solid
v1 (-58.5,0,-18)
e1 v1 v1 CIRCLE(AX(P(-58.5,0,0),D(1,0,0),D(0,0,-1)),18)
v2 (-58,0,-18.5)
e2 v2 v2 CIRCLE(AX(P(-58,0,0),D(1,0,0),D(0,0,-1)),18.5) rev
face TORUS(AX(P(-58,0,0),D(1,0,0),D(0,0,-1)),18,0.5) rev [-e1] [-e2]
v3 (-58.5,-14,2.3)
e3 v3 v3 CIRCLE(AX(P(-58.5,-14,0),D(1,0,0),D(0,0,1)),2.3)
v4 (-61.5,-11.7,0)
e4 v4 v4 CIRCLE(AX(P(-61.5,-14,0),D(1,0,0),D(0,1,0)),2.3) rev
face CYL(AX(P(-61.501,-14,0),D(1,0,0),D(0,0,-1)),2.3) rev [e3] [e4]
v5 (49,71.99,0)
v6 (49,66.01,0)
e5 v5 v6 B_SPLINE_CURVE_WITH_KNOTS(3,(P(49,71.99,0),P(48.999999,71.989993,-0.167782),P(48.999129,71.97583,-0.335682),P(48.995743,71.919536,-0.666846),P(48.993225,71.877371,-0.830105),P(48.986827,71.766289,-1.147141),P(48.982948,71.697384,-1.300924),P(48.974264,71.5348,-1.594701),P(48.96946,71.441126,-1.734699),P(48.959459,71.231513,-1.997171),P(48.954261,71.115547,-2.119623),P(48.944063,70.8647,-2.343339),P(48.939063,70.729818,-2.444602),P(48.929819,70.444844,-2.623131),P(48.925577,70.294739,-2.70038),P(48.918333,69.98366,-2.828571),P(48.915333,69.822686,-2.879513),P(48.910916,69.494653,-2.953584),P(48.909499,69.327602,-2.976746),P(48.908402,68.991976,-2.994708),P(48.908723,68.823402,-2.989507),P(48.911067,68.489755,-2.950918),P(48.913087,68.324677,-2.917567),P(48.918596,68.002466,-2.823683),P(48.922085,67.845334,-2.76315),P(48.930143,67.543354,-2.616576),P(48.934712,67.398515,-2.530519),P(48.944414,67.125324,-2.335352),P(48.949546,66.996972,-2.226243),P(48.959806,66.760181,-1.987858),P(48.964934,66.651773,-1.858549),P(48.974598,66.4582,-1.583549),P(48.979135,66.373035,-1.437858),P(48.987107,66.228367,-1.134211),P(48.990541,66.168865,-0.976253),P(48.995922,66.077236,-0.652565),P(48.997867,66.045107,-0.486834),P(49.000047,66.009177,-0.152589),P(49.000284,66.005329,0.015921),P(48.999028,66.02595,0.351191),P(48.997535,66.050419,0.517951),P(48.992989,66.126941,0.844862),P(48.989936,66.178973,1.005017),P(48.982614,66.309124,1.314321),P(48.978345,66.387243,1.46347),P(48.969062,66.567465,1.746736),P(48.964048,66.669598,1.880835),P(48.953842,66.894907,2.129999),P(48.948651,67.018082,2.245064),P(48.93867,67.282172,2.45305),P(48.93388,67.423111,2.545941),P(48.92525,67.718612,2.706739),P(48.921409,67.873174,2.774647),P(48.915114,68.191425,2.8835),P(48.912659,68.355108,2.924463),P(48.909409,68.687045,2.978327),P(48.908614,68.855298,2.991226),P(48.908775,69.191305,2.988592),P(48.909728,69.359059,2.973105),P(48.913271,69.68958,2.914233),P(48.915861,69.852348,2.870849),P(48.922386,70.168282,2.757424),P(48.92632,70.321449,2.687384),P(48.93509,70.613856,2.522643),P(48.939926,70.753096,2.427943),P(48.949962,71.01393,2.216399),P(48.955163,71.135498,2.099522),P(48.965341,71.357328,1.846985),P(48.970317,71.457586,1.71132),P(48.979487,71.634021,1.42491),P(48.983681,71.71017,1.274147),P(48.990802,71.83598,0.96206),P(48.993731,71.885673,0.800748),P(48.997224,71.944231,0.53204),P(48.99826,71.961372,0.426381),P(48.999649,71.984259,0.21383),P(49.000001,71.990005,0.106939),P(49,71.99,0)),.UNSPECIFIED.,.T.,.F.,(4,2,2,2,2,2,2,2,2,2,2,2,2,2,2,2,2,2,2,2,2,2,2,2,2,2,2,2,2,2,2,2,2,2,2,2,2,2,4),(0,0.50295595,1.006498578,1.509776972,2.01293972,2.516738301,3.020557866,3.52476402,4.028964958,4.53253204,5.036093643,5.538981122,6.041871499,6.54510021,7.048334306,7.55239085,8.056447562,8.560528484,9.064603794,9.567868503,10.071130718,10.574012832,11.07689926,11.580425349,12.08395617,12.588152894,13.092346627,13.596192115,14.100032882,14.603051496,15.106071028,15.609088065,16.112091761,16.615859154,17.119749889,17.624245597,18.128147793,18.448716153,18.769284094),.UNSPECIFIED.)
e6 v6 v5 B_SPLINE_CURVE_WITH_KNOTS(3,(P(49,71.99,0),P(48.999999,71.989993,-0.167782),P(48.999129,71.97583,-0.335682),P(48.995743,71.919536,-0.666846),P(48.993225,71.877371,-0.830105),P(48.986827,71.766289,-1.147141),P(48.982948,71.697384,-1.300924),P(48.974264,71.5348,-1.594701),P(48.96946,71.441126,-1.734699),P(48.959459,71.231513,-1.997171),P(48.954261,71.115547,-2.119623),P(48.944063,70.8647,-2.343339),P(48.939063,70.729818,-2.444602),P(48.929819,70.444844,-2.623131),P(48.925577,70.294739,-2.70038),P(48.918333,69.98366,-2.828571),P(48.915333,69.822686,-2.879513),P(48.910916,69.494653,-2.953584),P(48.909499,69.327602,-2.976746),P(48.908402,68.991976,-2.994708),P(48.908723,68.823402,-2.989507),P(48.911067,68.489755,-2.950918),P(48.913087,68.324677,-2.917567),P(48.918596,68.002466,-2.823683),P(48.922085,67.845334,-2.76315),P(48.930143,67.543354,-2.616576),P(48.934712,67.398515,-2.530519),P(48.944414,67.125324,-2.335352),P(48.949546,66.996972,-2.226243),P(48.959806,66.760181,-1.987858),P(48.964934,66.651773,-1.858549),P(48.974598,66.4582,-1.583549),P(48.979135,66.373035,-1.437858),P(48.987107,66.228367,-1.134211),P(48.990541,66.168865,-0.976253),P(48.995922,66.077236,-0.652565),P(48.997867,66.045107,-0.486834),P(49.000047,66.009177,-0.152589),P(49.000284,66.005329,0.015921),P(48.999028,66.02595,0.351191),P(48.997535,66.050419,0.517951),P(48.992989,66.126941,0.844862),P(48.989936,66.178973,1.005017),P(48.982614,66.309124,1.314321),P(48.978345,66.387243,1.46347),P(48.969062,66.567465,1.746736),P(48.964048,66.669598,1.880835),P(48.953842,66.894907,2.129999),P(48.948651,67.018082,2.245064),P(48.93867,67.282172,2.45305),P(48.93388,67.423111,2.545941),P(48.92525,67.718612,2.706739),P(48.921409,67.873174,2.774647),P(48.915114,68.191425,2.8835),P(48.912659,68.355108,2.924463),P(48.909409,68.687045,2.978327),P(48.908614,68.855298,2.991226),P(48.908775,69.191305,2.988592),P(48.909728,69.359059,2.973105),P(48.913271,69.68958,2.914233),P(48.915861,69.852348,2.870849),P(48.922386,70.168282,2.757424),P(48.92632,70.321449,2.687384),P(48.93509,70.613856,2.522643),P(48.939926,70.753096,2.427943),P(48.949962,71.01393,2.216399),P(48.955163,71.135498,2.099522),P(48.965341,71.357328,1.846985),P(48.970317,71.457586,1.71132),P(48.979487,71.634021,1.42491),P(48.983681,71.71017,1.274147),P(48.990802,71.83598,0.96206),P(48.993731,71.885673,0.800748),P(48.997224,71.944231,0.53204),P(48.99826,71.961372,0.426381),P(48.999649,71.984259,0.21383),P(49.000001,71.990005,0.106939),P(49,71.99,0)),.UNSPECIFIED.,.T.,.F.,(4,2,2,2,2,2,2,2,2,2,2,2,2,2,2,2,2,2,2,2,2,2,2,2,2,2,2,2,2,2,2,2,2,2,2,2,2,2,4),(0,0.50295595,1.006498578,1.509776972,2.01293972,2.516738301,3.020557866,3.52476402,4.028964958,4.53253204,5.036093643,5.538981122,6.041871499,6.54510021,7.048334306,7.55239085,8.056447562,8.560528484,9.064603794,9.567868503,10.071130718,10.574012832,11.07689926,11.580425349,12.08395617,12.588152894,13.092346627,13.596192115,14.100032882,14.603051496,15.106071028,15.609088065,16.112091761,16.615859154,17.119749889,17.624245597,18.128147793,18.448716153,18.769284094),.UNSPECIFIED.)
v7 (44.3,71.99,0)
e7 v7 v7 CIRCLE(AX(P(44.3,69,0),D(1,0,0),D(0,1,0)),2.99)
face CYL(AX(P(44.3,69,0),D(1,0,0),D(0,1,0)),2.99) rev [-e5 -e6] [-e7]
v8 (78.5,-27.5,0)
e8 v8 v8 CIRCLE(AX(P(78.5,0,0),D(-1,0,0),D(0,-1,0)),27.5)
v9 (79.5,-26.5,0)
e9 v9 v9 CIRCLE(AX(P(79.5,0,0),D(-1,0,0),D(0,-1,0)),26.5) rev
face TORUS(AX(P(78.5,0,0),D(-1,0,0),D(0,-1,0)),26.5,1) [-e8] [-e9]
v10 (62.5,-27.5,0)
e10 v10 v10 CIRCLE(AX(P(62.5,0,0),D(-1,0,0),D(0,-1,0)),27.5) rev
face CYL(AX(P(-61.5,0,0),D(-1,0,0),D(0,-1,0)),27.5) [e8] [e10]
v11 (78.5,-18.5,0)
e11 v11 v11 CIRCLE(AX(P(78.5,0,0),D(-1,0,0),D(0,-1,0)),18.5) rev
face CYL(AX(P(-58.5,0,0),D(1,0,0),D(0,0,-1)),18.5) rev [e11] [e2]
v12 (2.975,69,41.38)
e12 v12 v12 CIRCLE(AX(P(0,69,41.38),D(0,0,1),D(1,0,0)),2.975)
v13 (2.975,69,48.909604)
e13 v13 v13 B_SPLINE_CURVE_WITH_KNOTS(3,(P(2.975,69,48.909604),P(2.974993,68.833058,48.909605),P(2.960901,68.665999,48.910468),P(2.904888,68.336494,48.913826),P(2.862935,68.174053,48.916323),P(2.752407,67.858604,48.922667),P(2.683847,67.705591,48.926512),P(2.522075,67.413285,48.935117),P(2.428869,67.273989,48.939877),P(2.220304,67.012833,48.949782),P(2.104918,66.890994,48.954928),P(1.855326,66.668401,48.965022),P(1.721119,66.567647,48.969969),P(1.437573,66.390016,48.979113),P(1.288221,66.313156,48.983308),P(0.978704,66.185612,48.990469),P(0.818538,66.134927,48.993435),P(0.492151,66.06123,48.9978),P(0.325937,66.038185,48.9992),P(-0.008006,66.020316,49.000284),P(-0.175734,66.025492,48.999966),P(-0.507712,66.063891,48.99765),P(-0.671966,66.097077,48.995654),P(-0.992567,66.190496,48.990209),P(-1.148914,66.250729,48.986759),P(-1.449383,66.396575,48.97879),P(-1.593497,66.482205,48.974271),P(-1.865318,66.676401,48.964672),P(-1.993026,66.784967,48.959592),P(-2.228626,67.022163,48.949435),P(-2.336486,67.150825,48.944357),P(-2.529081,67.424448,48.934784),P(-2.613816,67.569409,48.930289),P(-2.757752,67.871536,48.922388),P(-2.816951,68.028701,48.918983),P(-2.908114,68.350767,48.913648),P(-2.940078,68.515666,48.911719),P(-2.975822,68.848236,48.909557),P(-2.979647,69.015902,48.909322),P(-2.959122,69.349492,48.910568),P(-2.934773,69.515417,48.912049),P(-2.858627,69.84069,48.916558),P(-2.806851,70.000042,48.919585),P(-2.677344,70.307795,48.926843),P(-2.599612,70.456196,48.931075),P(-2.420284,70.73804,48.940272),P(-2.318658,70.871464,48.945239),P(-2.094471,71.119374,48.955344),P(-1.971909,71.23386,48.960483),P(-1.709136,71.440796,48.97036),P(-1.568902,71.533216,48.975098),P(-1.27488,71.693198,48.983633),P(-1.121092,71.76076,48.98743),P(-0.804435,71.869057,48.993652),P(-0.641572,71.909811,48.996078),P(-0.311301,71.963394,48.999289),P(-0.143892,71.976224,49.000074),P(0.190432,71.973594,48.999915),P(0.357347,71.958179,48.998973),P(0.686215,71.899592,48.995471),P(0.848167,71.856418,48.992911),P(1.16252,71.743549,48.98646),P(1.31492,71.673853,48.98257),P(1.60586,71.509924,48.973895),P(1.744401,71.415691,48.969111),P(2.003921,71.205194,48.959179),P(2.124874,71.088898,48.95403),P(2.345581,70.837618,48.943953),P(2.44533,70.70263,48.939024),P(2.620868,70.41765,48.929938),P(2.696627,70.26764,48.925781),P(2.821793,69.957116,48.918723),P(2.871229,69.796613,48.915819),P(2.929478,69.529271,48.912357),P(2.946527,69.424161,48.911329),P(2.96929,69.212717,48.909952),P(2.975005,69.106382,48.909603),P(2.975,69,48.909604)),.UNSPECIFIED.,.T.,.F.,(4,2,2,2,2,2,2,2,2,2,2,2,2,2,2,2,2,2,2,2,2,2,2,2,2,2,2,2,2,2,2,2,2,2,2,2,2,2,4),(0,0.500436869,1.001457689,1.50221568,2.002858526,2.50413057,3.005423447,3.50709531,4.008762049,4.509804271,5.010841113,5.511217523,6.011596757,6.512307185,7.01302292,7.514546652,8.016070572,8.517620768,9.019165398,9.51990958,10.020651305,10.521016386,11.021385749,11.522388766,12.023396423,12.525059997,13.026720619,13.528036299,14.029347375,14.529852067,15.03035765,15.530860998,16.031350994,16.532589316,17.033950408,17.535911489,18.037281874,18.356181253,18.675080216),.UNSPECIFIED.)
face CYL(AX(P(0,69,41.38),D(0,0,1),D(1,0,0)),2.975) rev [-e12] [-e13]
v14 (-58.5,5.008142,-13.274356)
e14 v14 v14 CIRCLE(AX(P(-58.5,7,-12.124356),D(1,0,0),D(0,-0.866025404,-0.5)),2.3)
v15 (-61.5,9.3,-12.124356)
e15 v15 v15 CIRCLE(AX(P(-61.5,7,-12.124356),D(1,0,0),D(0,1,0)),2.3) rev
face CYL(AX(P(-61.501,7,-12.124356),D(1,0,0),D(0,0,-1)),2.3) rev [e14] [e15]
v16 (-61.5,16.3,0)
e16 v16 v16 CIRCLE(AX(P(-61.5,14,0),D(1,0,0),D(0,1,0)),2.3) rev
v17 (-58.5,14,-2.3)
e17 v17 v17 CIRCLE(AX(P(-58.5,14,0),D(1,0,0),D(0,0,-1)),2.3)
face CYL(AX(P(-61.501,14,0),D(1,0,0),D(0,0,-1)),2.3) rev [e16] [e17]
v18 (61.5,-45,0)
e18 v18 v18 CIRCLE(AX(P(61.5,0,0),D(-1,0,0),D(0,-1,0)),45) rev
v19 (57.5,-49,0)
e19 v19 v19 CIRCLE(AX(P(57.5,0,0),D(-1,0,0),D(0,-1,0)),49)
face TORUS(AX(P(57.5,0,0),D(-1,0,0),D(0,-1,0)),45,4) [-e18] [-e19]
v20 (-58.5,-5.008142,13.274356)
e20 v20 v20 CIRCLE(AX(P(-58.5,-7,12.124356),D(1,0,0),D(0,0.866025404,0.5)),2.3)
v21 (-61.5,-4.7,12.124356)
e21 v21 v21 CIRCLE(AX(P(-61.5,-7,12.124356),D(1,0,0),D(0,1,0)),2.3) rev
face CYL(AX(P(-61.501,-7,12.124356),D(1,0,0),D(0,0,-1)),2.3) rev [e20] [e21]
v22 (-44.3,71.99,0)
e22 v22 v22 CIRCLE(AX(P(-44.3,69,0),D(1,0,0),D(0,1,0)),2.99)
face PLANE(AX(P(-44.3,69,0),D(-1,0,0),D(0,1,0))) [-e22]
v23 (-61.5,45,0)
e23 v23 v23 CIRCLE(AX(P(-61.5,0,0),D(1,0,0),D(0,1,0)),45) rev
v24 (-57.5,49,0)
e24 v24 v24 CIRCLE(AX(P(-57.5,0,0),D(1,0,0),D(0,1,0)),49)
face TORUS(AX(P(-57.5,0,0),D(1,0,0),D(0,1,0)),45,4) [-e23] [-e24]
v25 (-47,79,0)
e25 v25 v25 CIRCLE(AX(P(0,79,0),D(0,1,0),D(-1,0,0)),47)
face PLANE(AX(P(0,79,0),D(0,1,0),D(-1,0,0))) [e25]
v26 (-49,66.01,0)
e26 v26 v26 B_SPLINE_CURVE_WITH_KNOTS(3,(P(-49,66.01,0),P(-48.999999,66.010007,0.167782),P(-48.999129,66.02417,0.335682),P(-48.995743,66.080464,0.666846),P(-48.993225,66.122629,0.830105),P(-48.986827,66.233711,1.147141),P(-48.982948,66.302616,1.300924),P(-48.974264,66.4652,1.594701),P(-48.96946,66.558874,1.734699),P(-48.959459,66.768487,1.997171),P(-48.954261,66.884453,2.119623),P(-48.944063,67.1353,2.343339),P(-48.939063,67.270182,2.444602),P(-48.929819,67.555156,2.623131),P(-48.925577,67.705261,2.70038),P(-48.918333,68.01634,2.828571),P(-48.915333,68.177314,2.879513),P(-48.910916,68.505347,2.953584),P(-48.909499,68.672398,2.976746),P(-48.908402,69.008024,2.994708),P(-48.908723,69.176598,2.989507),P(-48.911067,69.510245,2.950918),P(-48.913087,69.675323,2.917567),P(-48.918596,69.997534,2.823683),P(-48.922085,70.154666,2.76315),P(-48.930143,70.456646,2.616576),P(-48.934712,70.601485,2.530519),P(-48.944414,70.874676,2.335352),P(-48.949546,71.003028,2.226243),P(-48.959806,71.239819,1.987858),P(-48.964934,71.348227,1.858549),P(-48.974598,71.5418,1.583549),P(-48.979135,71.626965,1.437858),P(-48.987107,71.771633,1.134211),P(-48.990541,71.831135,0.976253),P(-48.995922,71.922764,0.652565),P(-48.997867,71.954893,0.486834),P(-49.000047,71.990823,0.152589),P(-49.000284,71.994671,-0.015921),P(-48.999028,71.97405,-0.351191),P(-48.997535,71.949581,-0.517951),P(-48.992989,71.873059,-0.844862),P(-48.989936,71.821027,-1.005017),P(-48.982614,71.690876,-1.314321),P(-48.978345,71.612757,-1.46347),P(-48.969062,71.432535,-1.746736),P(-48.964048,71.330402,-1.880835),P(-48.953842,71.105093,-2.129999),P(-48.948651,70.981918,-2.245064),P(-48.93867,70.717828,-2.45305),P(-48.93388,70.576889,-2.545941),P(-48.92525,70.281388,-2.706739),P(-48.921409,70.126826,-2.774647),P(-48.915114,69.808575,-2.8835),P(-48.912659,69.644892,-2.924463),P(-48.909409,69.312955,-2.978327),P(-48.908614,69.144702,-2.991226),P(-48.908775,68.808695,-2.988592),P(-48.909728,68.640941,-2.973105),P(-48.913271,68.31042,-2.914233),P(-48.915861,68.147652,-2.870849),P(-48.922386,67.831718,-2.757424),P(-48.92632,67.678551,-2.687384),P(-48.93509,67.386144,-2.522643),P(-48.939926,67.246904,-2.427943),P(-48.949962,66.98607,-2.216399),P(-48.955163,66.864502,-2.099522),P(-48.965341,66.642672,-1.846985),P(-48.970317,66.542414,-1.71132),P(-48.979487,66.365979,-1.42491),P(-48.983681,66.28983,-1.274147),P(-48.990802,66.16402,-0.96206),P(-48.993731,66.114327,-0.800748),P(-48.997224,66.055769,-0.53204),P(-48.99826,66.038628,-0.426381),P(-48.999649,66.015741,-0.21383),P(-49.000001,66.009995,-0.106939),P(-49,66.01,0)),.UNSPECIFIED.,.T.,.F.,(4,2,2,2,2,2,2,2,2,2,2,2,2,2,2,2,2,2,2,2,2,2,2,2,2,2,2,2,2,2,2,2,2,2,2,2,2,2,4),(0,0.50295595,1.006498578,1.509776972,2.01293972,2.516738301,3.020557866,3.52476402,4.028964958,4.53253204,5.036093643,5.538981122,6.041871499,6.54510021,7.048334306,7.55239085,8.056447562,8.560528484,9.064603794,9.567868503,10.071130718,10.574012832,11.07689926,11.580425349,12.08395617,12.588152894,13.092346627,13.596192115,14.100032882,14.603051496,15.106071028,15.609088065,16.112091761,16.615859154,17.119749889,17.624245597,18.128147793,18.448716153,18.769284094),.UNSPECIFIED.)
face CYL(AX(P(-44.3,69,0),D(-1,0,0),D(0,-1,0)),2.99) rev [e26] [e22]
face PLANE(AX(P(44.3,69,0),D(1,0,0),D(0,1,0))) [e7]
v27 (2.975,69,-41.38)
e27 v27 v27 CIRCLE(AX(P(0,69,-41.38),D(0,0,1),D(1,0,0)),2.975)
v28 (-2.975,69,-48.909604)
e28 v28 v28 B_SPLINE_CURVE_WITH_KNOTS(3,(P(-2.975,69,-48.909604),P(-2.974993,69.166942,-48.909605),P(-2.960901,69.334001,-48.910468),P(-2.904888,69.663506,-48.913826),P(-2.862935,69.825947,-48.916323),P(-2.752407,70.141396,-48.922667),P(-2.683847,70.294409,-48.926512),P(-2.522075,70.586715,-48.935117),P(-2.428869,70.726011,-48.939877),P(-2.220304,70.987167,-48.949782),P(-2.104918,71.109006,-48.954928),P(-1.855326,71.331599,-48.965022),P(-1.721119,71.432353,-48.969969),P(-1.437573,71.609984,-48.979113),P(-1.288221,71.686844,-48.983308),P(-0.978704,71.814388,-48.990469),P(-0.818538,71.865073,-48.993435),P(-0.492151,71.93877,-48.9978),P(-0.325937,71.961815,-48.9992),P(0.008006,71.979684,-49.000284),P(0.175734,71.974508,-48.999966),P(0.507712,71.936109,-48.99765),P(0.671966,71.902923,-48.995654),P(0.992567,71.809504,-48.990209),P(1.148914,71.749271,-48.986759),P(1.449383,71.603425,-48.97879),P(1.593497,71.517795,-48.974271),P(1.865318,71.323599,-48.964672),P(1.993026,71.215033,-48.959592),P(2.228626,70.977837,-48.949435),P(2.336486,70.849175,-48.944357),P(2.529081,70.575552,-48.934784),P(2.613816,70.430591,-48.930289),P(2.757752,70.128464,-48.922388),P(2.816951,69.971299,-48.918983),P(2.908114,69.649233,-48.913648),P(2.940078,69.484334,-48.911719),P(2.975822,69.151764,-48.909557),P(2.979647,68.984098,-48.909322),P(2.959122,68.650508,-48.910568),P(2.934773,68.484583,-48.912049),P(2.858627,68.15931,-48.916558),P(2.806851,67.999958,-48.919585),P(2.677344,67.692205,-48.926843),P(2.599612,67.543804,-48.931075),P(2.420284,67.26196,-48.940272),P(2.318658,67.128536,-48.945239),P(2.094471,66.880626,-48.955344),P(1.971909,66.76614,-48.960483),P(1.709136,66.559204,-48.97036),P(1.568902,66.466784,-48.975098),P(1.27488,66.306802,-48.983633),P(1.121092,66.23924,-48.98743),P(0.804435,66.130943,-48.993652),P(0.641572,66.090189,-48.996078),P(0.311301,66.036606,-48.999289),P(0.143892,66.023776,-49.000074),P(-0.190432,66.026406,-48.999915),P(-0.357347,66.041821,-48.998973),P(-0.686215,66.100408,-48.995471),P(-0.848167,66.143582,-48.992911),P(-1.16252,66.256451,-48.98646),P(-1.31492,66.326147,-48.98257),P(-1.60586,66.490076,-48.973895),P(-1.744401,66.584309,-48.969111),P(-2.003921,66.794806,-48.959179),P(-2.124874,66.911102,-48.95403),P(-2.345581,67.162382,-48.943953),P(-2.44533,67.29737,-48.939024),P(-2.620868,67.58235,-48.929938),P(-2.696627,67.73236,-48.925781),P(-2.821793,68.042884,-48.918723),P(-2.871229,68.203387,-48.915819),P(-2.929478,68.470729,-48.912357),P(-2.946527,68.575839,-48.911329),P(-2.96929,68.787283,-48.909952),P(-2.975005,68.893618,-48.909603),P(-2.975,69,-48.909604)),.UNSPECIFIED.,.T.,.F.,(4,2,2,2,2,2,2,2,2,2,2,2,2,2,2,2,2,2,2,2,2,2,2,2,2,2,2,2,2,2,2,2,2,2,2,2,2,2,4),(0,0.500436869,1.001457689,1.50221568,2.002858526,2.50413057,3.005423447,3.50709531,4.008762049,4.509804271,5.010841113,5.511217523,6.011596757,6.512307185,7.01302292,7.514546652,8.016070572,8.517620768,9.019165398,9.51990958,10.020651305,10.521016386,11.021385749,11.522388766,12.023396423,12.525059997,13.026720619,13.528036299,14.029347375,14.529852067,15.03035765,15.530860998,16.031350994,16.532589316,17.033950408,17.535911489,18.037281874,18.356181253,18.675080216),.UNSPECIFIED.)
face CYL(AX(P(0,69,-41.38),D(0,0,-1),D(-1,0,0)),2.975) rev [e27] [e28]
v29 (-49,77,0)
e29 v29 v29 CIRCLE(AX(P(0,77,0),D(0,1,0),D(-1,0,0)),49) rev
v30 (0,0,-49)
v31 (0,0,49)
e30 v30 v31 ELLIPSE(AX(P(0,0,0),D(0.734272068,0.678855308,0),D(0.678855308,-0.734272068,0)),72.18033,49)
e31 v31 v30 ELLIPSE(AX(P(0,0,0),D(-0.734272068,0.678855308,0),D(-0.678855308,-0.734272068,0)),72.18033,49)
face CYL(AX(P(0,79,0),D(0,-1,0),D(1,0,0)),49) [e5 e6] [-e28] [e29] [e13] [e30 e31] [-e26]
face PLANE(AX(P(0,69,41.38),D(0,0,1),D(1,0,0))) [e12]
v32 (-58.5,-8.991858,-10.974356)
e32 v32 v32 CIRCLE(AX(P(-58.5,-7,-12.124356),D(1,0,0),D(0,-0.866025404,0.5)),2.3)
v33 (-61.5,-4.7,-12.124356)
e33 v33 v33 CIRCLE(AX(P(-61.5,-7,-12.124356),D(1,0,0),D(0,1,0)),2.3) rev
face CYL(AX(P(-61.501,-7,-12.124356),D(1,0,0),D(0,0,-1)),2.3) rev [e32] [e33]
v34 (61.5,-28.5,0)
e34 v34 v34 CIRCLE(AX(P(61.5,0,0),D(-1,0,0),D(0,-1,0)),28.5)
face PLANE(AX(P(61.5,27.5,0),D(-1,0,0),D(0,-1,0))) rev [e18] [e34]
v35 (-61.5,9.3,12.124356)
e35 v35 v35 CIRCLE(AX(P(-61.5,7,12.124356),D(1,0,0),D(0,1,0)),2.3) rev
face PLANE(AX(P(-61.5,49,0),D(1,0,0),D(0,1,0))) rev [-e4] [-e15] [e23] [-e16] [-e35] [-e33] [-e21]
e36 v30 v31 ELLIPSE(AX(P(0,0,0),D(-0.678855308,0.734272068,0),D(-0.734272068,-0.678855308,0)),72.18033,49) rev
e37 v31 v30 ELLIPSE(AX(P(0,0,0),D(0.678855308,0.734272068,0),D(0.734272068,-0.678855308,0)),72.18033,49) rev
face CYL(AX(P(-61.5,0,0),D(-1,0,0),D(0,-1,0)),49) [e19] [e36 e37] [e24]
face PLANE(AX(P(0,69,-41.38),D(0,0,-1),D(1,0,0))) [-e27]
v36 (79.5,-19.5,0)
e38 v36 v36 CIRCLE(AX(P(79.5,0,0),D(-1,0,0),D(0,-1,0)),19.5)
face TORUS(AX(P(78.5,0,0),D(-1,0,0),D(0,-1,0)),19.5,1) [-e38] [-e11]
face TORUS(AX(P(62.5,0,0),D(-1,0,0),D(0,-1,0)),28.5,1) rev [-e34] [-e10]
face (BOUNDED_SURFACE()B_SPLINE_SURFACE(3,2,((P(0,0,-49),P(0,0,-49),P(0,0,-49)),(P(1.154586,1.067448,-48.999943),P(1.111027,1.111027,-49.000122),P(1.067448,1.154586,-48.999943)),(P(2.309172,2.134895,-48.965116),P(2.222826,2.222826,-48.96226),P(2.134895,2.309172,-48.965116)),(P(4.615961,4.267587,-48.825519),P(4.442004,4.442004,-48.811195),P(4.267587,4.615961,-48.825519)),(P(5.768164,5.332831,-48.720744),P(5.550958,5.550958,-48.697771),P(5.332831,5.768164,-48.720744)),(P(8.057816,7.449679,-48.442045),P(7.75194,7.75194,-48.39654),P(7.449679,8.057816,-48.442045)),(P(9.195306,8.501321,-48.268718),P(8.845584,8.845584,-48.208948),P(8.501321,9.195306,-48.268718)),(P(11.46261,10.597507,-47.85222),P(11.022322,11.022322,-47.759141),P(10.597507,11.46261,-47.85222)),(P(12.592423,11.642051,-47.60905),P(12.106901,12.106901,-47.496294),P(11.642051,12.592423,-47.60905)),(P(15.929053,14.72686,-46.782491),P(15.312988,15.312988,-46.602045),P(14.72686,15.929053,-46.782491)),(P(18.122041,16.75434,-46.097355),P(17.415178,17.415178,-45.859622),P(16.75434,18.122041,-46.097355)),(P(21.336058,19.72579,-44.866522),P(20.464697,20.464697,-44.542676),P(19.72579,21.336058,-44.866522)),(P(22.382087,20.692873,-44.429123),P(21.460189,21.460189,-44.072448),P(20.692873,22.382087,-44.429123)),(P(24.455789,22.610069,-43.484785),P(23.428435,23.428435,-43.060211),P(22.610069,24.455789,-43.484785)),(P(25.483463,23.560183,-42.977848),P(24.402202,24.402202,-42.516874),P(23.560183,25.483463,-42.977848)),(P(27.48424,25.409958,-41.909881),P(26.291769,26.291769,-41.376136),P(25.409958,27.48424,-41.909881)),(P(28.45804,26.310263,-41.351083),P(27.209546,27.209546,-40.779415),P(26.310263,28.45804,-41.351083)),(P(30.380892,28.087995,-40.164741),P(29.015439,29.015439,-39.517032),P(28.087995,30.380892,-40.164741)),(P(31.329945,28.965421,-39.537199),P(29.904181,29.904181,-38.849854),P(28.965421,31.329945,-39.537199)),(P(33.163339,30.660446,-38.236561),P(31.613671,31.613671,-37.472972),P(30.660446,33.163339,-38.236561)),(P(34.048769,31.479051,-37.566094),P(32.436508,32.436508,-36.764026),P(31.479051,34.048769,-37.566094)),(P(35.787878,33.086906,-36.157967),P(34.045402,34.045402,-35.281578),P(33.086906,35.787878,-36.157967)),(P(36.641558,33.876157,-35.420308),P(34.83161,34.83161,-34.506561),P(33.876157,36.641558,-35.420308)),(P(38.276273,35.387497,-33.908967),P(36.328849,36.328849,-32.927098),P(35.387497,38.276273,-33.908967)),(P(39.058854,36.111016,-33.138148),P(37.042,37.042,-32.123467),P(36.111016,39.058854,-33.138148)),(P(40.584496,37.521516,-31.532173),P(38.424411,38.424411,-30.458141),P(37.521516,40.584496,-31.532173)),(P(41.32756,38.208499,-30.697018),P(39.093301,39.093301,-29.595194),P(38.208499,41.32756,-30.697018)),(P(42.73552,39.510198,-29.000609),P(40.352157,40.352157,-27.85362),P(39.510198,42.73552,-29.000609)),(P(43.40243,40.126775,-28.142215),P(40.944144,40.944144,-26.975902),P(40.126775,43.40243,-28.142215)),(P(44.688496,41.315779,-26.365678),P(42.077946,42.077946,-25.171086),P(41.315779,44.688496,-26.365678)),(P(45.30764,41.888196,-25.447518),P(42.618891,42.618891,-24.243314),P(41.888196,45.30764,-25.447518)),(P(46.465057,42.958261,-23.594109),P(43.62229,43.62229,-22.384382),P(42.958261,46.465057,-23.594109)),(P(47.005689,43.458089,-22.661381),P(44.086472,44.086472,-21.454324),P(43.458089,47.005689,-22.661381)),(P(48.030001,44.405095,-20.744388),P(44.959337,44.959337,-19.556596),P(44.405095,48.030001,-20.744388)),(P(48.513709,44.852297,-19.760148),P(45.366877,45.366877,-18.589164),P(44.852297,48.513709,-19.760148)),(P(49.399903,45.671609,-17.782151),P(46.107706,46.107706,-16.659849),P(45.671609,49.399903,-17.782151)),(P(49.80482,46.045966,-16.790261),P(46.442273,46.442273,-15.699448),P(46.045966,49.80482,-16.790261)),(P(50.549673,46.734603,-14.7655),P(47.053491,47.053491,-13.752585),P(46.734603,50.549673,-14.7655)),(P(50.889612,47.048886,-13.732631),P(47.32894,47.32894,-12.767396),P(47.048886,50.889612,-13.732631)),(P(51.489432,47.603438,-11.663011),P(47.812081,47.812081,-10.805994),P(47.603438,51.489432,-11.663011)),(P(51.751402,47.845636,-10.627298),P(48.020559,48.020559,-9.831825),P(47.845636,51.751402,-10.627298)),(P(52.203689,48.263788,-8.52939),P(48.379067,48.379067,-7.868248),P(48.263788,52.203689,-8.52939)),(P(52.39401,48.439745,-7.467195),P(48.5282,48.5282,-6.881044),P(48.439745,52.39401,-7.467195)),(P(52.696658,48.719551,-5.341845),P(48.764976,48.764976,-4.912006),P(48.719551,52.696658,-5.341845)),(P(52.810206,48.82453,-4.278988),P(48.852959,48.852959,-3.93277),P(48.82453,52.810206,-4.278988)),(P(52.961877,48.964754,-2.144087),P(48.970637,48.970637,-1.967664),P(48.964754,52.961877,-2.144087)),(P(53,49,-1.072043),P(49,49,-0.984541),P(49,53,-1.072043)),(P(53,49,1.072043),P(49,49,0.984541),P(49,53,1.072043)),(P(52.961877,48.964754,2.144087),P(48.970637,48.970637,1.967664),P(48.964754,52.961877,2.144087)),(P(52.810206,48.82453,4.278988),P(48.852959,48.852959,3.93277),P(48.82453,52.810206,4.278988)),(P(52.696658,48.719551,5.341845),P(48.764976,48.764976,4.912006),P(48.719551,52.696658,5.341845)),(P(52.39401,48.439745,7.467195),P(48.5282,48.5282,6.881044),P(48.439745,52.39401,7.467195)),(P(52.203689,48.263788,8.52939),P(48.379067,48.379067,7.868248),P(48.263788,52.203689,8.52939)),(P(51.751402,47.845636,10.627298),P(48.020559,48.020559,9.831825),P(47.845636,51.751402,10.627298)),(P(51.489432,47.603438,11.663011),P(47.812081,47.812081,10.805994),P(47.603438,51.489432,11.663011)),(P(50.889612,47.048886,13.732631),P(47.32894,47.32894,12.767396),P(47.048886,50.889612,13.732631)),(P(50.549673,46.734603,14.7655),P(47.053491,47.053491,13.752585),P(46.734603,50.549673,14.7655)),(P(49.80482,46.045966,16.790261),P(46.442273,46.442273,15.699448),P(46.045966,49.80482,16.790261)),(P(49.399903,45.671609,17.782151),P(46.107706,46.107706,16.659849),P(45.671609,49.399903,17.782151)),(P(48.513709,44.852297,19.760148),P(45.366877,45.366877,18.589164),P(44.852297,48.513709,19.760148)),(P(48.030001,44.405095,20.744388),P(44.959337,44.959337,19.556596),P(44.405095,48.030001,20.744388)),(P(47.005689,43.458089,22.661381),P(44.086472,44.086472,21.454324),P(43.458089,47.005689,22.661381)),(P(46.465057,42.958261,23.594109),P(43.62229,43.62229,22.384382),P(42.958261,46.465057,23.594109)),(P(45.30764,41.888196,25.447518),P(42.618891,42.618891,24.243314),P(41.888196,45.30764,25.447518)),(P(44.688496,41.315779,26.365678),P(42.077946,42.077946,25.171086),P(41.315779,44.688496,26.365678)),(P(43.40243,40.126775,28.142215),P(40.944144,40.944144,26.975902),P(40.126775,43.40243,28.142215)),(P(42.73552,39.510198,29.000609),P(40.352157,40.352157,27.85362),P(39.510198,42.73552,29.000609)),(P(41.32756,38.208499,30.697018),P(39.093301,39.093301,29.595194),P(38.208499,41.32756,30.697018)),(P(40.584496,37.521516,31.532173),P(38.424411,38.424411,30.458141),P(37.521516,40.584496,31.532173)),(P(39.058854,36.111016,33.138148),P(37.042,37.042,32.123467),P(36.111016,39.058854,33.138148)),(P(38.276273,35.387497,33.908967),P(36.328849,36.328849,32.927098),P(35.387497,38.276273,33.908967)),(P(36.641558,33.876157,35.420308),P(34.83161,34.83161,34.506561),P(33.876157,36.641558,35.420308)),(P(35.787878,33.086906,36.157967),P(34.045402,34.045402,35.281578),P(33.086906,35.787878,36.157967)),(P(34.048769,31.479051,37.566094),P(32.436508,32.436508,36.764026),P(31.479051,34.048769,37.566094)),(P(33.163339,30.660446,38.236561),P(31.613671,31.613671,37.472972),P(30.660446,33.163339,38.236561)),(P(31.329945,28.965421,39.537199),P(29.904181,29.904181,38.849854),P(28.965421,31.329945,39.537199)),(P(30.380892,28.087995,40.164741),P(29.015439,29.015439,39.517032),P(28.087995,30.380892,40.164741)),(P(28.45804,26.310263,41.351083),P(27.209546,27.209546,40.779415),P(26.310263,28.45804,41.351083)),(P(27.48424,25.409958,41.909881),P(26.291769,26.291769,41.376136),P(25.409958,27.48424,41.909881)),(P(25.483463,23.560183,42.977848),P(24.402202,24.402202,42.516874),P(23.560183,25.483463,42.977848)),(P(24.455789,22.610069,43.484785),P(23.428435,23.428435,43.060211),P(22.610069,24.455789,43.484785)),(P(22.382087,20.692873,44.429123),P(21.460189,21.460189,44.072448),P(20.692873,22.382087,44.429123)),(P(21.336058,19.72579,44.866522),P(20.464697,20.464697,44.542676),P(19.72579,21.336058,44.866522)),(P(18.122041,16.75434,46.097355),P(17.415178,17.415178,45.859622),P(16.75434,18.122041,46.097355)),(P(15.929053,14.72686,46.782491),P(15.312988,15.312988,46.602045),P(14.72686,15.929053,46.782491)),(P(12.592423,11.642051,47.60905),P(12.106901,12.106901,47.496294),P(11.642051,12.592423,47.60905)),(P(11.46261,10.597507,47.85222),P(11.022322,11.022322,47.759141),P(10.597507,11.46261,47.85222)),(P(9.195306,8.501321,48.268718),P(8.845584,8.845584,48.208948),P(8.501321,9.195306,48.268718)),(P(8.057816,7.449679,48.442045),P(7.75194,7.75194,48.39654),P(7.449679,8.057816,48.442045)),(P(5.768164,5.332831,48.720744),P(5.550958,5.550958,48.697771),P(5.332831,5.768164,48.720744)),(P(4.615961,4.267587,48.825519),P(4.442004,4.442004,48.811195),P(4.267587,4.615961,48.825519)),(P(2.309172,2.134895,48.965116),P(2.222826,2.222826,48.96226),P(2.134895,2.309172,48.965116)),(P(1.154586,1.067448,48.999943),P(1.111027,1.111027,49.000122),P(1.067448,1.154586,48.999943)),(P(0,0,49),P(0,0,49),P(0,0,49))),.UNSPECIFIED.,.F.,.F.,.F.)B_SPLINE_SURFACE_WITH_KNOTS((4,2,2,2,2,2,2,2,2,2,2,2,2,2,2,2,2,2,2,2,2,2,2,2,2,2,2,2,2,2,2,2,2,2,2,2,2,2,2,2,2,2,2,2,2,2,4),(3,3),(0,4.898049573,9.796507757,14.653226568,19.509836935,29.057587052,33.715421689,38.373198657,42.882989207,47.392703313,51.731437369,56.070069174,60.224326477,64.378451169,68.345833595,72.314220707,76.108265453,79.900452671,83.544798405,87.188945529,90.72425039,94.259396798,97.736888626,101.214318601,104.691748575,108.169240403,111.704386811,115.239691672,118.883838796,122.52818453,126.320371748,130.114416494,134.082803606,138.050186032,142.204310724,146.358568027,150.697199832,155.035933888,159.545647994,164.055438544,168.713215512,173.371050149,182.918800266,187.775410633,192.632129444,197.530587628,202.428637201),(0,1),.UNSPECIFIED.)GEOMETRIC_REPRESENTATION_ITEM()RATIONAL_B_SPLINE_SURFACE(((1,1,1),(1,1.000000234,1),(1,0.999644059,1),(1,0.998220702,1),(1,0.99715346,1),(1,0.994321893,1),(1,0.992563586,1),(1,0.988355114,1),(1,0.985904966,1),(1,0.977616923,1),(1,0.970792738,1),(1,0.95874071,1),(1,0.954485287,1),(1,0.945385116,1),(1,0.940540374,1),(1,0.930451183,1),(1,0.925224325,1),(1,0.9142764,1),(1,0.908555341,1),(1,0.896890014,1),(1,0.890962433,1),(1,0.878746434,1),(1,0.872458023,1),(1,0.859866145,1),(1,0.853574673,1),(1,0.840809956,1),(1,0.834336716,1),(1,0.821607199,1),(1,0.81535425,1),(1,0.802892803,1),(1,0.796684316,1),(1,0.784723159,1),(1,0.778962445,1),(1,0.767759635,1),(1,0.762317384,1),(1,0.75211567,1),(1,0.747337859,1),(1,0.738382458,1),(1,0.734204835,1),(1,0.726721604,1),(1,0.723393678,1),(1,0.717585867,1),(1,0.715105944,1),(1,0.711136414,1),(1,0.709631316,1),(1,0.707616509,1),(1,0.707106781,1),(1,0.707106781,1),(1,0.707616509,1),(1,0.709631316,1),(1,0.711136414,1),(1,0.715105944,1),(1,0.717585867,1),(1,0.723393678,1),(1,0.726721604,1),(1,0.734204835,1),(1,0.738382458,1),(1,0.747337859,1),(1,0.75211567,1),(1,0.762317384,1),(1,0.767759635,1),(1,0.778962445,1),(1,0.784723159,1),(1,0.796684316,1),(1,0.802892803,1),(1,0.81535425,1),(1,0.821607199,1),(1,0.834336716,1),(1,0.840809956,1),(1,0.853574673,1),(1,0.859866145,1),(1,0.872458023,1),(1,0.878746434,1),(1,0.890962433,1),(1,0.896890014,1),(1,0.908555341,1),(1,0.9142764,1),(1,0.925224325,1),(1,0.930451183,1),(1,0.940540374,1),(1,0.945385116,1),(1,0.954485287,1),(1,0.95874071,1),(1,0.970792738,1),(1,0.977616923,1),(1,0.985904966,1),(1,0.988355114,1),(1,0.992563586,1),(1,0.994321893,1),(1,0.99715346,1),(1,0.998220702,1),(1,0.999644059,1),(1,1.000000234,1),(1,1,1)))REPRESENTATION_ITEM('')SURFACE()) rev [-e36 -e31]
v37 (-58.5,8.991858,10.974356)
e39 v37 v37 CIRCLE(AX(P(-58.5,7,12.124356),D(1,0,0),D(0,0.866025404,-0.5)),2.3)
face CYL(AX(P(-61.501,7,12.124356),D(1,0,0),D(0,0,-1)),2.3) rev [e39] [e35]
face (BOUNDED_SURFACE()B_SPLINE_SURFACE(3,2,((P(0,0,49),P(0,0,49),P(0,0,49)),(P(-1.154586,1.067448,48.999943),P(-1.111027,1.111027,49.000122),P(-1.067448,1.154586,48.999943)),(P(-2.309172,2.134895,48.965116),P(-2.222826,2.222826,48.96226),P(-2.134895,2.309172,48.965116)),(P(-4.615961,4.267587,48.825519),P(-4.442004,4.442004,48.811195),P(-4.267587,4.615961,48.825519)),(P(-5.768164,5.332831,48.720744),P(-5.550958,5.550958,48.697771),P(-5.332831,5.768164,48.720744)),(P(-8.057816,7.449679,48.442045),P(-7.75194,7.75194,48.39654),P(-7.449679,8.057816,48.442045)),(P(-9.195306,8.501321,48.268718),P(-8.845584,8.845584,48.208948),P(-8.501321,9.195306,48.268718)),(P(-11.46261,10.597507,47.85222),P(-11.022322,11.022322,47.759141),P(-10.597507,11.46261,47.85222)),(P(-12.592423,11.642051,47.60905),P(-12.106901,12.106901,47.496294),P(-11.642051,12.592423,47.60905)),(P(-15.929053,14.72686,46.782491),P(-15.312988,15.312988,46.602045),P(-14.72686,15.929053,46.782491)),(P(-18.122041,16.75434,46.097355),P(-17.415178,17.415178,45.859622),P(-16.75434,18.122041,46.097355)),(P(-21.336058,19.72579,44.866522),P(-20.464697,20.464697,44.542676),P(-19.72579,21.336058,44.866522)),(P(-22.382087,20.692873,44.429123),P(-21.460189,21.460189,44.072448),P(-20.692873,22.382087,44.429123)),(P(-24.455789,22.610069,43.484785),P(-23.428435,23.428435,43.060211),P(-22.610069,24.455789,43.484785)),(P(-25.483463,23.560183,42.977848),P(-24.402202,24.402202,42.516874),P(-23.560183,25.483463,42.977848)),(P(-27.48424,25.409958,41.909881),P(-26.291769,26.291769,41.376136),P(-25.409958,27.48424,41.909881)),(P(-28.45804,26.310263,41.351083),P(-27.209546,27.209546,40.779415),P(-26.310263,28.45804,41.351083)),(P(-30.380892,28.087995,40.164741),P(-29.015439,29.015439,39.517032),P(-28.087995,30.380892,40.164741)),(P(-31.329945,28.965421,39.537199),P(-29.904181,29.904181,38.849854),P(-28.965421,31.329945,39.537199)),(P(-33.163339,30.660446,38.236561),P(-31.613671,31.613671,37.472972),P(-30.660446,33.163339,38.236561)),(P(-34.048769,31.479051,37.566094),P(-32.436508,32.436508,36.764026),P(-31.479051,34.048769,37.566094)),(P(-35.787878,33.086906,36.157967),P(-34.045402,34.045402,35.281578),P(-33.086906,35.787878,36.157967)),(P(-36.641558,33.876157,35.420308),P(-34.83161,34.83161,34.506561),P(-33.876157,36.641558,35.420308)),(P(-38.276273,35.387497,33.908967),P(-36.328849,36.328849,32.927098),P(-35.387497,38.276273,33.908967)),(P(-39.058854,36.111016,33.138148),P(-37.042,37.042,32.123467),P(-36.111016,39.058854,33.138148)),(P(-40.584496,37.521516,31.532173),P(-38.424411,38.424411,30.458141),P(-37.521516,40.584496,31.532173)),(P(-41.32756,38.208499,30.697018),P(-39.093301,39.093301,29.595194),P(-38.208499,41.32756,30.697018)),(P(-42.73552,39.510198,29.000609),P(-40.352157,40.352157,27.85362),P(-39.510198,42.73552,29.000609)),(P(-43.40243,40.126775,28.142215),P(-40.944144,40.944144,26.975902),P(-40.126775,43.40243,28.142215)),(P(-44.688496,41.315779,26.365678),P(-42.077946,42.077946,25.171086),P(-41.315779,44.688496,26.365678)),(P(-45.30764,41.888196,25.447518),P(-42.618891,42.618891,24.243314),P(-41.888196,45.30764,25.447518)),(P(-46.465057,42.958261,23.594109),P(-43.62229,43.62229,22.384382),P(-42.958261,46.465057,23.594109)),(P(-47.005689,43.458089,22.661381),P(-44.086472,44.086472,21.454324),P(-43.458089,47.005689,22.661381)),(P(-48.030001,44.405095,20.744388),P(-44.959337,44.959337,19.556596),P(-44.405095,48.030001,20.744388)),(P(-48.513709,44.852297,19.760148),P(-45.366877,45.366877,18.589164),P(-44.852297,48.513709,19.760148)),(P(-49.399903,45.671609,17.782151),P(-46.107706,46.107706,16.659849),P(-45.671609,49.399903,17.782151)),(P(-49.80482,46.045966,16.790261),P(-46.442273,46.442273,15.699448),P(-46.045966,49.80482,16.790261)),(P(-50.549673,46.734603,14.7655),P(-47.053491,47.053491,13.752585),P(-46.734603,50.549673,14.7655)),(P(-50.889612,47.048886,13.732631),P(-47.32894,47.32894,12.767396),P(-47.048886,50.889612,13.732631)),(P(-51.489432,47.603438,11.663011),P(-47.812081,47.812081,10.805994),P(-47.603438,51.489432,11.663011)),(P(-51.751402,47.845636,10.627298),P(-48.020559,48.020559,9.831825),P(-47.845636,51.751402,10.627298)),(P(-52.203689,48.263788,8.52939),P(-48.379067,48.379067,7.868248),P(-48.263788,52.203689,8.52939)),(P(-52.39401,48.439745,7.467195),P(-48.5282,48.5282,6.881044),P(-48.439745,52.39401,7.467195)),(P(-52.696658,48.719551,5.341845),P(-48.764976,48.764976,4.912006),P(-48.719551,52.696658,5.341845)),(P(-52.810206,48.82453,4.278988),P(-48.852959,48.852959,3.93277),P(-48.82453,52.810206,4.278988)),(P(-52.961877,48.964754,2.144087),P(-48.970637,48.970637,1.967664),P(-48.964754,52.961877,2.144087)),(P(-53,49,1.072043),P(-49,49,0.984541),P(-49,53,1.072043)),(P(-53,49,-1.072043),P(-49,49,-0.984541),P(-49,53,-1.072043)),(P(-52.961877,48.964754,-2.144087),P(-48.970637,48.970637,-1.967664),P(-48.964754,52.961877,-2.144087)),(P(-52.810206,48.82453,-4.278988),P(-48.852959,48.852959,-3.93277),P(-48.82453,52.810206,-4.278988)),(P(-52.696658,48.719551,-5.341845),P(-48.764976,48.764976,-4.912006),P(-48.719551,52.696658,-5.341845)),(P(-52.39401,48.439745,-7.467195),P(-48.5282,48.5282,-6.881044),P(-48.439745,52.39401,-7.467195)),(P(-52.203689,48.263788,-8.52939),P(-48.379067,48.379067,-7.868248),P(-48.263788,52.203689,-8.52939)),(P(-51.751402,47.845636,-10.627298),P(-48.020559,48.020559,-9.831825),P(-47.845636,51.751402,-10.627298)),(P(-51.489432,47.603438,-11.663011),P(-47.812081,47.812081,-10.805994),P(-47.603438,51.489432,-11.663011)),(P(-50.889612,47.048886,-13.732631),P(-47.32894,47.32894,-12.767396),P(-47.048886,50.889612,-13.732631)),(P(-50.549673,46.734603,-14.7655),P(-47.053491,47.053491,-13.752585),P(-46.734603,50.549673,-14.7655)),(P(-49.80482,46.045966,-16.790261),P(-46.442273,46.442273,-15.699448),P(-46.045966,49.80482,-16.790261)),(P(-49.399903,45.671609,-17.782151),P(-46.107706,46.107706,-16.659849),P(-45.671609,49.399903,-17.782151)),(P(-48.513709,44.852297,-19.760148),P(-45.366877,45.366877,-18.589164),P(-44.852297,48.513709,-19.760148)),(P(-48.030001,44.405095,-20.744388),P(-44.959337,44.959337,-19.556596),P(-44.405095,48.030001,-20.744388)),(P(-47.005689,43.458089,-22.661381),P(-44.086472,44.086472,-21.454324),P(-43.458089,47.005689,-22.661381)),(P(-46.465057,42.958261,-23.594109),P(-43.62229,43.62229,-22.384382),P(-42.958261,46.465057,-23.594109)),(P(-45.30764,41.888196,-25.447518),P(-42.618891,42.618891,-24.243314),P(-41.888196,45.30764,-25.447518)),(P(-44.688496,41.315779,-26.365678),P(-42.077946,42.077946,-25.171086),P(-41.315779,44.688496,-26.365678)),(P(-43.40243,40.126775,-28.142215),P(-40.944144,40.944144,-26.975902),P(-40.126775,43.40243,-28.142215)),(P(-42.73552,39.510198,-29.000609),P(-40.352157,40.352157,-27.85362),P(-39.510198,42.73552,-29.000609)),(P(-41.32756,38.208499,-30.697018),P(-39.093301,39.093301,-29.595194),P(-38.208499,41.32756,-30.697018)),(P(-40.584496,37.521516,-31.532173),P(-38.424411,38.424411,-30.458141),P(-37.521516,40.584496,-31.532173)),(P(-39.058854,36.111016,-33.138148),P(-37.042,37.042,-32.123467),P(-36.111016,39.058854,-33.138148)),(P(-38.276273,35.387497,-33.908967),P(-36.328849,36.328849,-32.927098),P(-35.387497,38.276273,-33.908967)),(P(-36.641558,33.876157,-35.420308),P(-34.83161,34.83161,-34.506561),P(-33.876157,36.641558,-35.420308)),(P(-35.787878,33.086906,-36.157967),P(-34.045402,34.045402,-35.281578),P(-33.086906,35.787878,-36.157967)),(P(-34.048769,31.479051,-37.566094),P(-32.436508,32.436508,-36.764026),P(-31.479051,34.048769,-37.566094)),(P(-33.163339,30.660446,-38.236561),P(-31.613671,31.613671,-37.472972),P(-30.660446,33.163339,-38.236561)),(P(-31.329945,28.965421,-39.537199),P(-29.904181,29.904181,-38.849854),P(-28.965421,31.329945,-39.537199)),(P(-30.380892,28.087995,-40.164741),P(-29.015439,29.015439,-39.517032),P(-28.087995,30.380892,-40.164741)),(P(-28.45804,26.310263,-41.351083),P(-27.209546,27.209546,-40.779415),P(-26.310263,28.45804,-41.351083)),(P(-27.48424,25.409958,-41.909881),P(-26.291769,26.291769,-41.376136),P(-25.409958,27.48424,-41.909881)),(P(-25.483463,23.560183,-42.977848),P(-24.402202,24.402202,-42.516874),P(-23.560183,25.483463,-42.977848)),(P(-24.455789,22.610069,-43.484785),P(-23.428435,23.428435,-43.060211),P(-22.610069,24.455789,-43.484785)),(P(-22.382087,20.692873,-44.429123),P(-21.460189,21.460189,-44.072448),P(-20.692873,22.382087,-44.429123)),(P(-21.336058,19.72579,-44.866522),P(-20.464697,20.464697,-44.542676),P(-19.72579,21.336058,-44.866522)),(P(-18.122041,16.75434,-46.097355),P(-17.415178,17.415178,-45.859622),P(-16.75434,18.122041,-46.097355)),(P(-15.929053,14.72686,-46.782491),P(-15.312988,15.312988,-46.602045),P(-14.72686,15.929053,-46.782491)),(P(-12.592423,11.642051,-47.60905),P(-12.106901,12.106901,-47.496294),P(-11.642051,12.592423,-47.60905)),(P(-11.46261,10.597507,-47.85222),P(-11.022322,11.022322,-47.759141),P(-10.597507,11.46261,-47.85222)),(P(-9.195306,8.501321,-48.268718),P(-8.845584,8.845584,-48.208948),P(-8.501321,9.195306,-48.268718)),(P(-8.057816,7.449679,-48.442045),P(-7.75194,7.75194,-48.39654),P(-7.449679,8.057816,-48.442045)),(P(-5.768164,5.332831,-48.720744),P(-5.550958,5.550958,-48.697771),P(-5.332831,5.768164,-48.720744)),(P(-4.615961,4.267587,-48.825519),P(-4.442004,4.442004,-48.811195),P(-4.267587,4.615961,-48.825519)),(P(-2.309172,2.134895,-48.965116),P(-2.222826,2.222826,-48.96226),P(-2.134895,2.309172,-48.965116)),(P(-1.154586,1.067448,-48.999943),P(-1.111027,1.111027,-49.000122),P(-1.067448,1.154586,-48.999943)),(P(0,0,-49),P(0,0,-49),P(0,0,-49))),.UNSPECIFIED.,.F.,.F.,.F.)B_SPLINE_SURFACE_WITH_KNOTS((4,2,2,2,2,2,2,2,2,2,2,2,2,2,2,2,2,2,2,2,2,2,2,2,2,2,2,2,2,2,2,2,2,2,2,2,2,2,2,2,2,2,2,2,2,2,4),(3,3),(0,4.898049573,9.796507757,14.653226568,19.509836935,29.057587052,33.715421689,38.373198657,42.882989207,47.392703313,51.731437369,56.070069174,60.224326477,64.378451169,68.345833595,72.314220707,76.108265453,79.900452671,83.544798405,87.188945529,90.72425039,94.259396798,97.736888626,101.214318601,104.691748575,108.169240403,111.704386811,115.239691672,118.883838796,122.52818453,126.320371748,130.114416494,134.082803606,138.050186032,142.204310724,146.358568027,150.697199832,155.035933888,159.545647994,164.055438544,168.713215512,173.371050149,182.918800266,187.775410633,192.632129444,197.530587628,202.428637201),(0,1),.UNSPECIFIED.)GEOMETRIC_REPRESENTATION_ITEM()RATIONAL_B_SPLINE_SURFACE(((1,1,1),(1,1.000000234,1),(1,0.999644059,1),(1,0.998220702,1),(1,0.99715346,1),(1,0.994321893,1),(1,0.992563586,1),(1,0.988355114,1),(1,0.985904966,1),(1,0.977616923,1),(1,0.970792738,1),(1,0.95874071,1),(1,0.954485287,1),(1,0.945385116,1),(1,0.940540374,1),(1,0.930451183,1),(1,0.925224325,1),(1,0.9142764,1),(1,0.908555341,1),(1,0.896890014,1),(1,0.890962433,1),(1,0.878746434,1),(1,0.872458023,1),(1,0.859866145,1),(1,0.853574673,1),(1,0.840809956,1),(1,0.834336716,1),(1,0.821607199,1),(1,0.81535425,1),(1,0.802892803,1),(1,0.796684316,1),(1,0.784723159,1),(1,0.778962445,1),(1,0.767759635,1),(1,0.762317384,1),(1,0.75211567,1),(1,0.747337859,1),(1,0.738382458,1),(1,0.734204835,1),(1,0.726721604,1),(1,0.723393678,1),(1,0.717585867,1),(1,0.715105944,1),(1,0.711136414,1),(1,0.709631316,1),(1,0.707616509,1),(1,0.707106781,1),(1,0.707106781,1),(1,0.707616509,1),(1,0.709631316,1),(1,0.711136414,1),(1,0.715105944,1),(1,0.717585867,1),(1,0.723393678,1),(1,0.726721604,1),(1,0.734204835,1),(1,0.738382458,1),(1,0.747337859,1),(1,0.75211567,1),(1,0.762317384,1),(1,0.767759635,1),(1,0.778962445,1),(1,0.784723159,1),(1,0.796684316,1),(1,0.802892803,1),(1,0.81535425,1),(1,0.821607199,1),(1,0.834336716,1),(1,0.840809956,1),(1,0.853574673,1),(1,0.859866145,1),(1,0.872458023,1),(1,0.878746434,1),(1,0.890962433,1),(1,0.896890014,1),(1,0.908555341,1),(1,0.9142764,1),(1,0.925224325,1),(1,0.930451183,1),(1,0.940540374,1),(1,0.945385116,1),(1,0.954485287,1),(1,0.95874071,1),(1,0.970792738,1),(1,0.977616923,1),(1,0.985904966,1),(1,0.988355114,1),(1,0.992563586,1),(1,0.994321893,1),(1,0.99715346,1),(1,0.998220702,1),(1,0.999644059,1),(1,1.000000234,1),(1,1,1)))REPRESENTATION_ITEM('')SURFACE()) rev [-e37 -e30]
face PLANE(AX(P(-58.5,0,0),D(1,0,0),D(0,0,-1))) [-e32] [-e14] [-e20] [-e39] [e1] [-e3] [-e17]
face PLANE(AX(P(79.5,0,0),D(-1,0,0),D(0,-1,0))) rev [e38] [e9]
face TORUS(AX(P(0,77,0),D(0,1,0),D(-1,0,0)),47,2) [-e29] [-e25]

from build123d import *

# Parameters (mm, degrees)
SKETCH5_R                                  = 18.5
CUT_EXTRUDE2_DEPTH                         = 138
SKETCH11_R                                 = 49
BOSS_EXTRUDE3_DEPTH                        = 30
BOSS_EXTRUDE3_DIRECTION_2_REACH            = 137.371
BOSS_EXTRUDE3_DIRECTION_2_END_RADIUS       = 49
CUT_EXTRUDE3_REACH                         = 168.391
SKETCH12_R                                 = 2.3
CIRPATTERN1_COUNT                          = 6
SKETCH14_R                                 = 2.975
CUT_EXTRUDE4_DEPTH                         = 7.62
SKETCH15_R                                 = 2.99
CUT_EXTRUDE5_DEPTH                         = 4.7
MIRROR2_AT_THE_SECOND_PLANE_COPY_1_SKETC_R = 2.99
MIRROR2_AT_THE_SECOND_PLANE_COPY_1_DEPTH   = 4.7
FILLET3_R                                  = 2
FILLET4_R                                  = 4
FILLET5_R                                  = 4
FILLET6_R                                  = 4
FILLET7_R                                  = 1
FILLET8_R                                  = 0.5


with BuildPart() as part:
    # Sketch4 → Revolve2 (revolve)
    with BuildSketch(Plane.XY):
        Polygon((-61.5, 0), (79.5, 0), (79.5, 27.5), (61.5, 27.5), (61.5, 49), (-61.5, 49), align=None)
    revolve(axis=Axis((-61.5, 0, 0), (1, 0, 0)))

    # Sketch5 → Cut-Extrude2 (cut)
    with BuildSketch(Plane(origin=(79.5, 0, 0), x_dir=(0, 0, -1), z_dir=(1, 0, 0))):
        Circle(SKETCH5_R)
    extrude(amount=-CUT_EXTRUDE2_DEPTH, mode=Mode.SUBTRACT)

    # Sketch11 → Boss-Extrude3 (add)
    with BuildSketch(Plane(origin=(0, 49, 0), x_dir=(1, 0, 0), z_dir=(0, 1, 0))):
        Circle(SKETCH11_R)
    extrude(amount=BOSS_EXTRUDE3_DEPTH)

    # Boss-Extrude3 direction 2: up to this cylinder (the profile starts outside it)
    boss_extrude3_direction_2_end = Plane(origin=(0, 0, 0), z_dir=(-1, 0, 0)) * Cylinder(BOSS_EXTRUDE3_DIRECTION_2_END_RADIUS, 373.742, mode=Mode.PRIVATE)
    # Sketch11 → Boss-Extrude3 direction 2 (add, up to the surface)
    with BuildSketch(Plane(origin=(0, 49, 0), x_dir=(1, 0, 0), z_dir=(0, 1, 0)), mode=Mode.PRIVATE) as boss_extrude3_direction_2_sk1:
        Circle(SKETCH11_R)
    boss_extrude3_direction_2_tool1 = extrude(boss_extrude3_direction_2_sk1.sketch, amount=-BOSS_EXTRUDE3_DIRECTION_2_REACH, mode=Mode.PRIVATE) - boss_extrude3_direction_2_end
    add(boss_extrude3_direction_2_tool1.solids().sort_by_distance((0, 49, 0))[0])
    add(boss_extrude3_direction_2_tool1.solids().sort_by_distance((0, 49, 0))[1])

    # Sketch12 → Cut-Extrude3 (cut, up to next)
    with BuildSketch(Plane(origin=(-58.5, 0, 0), x_dir=(0, 0, -1), z_dir=(1, 0, 0)), mode=Mode.PRIVATE) as cut_extrude3_sk1:
        with Locations((0, 14)):
            Circle(SKETCH12_R)
    cut_extrude3_tool1 = extrude(cut_extrude3_sk1.sketch, amount=-CUT_EXTRUDE3_REACH, mode=Mode.PRIVATE) & part.part
    cut_extrude3 = cut_extrude3_tool1.solids().sort_by_distance((-58.5, 14, 0))[0]
    add(cut_extrude3, mode=Mode.SUBTRACT)

    # CirPattern1: Cut-Extrude3 ×6 about axis
    cirpattern1_axis = Axis((-58.5, 0, 0), (1, 0, 0))
    for i in range(1, CIRPATTERN1_COUNT):
        add(cut_extrude3.rotate(cirpattern1_axis, i * 360 / CIRPATTERN1_COUNT), mode=Mode.SUBTRACT)

    # Sketch14 → Cut-Extrude4 (cut)
    with BuildSketch(Plane.XY.offset(49)):
        with Locations((0, 69)):
            Circle(SKETCH14_R)
    cut_extrude4 = extrude(amount=-CUT_EXTRUDE4_DEPTH, mode=Mode.SUBTRACT)

    # Mirror1: Cut-Extrude4 across plane
    add(cut_extrude4.mirror(Plane.XY), mode=Mode.SUBTRACT)

    # Sketch15 → Cut-Extrude5 (cut)
    with BuildSketch(Plane(origin=(49, 0, 0), x_dir=(0, 0, -1), z_dir=(1, 0, 0))):
        with Locations((0, 69)):
            Circle(SKETCH15_R)
    cut_extrude5 = extrude(amount=-CUT_EXTRUDE5_DEPTH, mode=Mode.SUBTRACT)

    # Mirror2: Cut-Extrude5 across plane
    add(cut_extrude5.mirror(Plane(origin=(0, 0, 0), x_dir=(0, 0, 1), z_dir=(1, 0, 0))), mode=Mode.SUBTRACT)

    # Mirror2 at the second plane: Cut-Extrude5 across plane
    add(cut_extrude5.mirror(Plane(origin=(49, 0, 0), x_dir=(0, 0, 1), z_dir=(1, 0, 0))), mode=Mode.SUBTRACT)

    # Mirror2 at the second plane copy 1 sketc → Mirror2 at the second plane copy 1 (cut)
    with BuildSketch(Plane(origin=(147, 0, 0), x_dir=(0, 0, -1), z_dir=(1, 0, 0))):
        with Locations((0, 69)):
            Circle(MIRROR2_AT_THE_SECOND_PLANE_COPY_1_SKETC_R)
    extrude(amount=-MIRROR2_AT_THE_SECOND_PLANE_COPY_1_DEPTH, mode=Mode.SUBTRACT)

    # Fillet3
    fillet3_edges = [part.edges().sort_by_distance(p)[0] for p in [
        (-49, 79, 0),
    ]]
    fillet(fillet3_edges, radius=FILLET3_R)

    # Fillet4
    fillet4_edges = [part.edges().sort_by_distance(p)[0] for p in [
        (-31.656396463, 31.656396463, 37.401504822),
        (31.656396464, 31.656396464, 37.401504822),
    ]]
    fillet(fillet4_edges, radius=FILLET4_R)

    # Fillet5
    fillet5_edges = [part.edges().sort_by_distance(p)[0] for p in [
        (61.5, -49, 0),
    ]]
    fillet(fillet5_edges, radius=FILLET5_R)

    # Fillet6
    fillet6_edges = [part.edges().sort_by_distance(p)[0] for p in [
        (-61.5, -49, 0),
    ]]
    fillet(fillet6_edges, radius=FILLET6_R)

    # Fillet7
    fillet7_edges = [part.edges().sort_by_distance(p)[0] for p in [
        (79.5, 0, 18.5),
        (79.5, -27.5, 0),
        (61.5, -27.5, 0),
    ]]
    fillet(fillet7_edges, radius=FILLET7_R)

    # Fillet8
    fillet8_edges = [part.edges().sort_by_distance(p)[0] for p in [
        (-58.5, 0, 18.5),
    ]]
    fillet(fillet8_edges, radius=FILLET8_R)


solid = part.part
